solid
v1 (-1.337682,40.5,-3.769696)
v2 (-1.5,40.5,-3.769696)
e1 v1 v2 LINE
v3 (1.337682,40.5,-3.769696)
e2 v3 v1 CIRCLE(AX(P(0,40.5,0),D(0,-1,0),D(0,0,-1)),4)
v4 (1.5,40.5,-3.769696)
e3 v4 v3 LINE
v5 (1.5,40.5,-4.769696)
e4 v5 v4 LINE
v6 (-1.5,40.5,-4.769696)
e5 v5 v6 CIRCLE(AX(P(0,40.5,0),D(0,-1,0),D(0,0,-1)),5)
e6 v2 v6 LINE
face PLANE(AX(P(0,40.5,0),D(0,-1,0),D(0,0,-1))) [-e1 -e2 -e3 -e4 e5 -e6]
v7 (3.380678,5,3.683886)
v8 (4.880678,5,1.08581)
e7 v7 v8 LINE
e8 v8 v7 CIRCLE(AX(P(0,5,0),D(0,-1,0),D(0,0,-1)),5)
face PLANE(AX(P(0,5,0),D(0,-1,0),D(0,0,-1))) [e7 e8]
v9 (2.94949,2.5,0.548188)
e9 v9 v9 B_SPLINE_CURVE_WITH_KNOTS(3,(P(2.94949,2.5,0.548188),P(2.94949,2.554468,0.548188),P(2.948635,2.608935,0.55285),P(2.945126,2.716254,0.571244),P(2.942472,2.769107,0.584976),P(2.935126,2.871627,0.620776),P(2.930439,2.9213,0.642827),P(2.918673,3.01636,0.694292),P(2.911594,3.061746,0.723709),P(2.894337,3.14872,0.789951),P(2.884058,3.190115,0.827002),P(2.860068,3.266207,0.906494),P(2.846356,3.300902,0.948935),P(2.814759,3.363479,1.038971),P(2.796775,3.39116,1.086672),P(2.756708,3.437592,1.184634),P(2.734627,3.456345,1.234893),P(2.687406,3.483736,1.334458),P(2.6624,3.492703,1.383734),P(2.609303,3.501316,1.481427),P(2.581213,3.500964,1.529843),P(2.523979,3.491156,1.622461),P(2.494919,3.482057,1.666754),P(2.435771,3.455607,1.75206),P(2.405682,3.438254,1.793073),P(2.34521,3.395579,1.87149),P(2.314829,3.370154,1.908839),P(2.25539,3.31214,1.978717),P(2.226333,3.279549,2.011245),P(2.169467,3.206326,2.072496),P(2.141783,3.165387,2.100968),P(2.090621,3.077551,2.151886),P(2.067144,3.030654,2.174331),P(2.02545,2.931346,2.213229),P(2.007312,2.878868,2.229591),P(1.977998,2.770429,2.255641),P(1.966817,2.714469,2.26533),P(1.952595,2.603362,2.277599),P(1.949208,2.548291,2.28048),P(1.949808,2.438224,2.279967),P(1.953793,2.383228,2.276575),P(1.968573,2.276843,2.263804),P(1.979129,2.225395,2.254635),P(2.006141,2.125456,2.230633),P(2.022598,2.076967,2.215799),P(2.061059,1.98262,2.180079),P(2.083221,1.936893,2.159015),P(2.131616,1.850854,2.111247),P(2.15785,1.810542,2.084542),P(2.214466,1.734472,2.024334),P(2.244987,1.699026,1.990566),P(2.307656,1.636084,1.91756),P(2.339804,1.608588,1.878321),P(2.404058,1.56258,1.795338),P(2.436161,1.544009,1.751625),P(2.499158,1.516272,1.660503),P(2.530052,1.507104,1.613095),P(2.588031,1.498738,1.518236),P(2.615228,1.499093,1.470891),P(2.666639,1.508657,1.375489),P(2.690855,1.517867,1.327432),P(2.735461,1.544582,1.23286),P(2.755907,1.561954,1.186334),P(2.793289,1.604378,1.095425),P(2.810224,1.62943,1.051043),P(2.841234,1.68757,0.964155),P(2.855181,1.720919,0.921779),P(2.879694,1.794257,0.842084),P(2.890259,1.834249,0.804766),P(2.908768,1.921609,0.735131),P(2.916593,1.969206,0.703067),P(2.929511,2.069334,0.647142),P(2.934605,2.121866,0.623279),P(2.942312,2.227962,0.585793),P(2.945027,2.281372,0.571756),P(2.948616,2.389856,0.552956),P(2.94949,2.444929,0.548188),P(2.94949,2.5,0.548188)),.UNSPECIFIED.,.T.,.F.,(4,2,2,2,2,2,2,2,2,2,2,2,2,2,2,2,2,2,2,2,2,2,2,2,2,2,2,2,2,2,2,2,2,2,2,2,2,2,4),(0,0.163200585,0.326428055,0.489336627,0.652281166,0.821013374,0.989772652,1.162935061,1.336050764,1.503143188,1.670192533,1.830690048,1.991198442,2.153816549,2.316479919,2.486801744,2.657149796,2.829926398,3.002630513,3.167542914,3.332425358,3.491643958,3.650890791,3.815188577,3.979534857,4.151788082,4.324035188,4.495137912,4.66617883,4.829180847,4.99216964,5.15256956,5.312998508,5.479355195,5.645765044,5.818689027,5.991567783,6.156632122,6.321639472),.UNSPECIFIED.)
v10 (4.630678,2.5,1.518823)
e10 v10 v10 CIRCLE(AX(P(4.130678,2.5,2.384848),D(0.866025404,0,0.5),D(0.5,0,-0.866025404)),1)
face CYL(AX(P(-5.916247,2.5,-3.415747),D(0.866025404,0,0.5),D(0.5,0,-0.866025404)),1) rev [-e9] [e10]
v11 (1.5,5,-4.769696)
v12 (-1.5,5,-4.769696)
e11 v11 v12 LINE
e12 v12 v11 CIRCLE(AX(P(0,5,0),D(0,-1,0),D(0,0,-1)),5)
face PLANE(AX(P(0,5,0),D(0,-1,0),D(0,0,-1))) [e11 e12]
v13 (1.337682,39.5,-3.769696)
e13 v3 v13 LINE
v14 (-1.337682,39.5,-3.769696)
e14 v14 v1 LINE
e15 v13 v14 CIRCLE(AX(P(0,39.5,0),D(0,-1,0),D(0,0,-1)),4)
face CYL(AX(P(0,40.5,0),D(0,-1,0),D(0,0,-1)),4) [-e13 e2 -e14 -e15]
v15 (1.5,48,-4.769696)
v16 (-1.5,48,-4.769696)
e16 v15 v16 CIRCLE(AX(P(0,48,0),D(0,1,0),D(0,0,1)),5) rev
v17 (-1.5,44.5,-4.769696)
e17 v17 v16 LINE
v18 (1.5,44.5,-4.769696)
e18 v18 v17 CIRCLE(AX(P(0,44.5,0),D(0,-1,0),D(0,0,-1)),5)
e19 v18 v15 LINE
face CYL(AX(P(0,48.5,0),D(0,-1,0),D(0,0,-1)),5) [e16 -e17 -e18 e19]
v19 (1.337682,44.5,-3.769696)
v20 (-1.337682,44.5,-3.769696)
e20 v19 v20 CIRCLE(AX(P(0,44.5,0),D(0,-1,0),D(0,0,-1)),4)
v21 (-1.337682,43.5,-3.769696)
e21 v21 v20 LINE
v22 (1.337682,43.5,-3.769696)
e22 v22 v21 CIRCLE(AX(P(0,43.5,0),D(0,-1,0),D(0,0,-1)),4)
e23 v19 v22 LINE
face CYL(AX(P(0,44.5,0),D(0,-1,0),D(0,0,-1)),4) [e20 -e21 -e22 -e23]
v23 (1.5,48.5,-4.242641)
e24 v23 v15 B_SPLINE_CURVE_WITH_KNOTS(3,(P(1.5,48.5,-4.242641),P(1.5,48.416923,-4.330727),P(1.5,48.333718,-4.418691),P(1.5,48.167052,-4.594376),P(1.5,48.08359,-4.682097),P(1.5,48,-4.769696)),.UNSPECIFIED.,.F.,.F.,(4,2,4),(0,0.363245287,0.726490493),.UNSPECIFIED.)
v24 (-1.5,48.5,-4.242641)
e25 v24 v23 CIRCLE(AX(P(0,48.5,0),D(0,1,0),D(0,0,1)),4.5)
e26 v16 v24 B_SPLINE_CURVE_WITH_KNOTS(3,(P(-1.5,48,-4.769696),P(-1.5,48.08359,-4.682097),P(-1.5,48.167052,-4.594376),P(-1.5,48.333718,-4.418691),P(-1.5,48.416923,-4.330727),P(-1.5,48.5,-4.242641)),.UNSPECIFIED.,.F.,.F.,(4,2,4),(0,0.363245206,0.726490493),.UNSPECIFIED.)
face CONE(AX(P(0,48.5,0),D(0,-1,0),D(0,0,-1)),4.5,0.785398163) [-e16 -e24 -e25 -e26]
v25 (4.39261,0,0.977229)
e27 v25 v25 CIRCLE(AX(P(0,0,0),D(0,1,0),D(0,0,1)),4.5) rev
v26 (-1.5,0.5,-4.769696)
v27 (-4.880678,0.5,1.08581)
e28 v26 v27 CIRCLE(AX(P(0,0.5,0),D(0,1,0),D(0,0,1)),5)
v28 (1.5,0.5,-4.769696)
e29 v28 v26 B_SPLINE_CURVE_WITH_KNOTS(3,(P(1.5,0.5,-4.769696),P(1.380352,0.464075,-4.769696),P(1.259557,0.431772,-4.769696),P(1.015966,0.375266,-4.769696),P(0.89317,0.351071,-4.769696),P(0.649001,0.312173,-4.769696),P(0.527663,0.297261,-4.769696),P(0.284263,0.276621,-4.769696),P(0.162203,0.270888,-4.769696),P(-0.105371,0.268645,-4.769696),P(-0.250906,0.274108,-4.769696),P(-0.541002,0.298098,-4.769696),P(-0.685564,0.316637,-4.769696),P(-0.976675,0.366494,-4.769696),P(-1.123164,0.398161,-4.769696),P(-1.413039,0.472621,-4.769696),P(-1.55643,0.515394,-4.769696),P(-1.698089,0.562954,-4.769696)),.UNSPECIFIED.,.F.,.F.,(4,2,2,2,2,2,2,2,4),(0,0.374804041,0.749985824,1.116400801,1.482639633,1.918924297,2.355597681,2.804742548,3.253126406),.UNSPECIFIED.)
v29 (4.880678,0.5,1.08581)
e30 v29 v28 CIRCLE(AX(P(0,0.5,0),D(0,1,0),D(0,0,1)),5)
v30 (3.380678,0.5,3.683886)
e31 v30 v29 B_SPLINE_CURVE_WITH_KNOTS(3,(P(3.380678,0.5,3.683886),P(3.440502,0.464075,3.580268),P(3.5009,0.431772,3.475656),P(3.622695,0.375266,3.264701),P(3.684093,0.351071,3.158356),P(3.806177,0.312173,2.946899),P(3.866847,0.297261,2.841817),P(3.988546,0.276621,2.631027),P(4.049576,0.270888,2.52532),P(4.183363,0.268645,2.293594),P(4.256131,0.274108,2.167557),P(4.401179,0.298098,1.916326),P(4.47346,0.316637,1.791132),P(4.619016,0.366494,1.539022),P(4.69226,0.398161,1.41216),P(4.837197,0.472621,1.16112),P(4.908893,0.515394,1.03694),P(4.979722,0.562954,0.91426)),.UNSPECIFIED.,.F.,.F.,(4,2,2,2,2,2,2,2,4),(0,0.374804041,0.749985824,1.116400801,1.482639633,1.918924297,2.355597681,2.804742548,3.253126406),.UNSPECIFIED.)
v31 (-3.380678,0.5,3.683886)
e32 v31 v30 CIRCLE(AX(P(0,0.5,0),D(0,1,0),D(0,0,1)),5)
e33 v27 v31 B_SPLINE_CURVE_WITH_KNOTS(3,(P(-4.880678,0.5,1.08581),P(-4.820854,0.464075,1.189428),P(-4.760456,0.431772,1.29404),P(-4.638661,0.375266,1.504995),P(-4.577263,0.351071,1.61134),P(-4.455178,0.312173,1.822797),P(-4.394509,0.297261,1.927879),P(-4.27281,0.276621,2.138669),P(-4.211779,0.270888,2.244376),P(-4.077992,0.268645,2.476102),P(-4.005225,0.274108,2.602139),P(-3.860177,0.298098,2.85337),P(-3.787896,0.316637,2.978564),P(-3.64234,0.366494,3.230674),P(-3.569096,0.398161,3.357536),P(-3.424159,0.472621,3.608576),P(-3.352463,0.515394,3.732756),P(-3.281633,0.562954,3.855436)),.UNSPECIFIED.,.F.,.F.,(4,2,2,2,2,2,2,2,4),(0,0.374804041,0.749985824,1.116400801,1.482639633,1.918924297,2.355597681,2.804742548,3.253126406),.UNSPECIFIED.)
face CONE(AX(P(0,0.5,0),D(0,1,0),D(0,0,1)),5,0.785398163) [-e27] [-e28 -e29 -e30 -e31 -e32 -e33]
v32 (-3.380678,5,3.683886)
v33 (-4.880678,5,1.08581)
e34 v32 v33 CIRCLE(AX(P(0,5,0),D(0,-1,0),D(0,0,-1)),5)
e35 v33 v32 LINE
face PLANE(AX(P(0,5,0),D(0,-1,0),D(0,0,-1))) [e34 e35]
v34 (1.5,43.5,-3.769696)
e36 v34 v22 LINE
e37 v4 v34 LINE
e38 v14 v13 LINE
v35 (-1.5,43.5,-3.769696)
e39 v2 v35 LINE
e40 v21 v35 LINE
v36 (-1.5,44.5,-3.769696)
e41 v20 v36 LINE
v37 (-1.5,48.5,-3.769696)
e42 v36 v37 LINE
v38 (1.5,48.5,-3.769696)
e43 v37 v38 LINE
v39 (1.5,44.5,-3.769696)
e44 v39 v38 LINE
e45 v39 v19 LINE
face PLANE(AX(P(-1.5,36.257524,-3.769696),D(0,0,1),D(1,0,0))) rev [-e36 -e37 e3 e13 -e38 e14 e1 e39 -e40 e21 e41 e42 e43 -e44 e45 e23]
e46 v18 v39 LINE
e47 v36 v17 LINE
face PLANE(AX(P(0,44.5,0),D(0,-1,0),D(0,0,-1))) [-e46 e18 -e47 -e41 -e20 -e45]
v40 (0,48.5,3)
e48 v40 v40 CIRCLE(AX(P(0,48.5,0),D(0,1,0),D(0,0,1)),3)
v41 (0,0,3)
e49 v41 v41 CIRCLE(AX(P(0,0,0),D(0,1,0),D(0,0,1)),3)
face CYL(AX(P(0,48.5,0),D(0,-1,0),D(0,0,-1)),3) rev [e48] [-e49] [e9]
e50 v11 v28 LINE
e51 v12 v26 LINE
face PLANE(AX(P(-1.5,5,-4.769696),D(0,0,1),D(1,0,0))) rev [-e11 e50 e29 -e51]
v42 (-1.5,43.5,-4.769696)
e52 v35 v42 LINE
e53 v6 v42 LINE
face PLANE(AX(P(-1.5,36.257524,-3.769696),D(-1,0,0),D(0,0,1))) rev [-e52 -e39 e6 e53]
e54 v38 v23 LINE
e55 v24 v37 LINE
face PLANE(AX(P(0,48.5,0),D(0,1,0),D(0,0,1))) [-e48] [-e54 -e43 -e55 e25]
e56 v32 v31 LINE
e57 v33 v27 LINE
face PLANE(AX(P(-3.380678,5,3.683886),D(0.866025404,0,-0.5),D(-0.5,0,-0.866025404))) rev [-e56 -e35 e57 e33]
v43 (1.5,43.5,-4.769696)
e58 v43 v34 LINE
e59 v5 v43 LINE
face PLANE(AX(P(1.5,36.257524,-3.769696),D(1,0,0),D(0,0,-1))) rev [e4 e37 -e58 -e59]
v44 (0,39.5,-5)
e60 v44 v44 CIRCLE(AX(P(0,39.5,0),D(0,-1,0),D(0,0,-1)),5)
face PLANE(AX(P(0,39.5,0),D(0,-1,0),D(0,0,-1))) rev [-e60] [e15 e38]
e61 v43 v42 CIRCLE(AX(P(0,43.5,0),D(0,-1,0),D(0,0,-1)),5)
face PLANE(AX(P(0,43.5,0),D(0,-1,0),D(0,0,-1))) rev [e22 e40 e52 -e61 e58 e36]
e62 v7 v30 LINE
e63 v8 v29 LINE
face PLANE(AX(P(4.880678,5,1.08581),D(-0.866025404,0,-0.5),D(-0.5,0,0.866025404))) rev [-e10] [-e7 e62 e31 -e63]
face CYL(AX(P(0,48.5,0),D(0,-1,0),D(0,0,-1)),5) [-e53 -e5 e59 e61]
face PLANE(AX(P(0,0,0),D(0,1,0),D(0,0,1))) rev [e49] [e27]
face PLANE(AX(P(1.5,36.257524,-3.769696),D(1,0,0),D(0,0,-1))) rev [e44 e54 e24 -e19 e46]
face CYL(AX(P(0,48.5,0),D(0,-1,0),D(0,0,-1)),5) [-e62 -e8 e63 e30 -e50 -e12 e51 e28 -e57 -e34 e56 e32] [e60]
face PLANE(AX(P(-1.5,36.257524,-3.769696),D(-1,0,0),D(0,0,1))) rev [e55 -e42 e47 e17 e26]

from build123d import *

# Parameters (mm, degrees)
ESQUISSE1_R                  = 5
ESQUISSE1_R_2                = 3
BOSS_EXTRU_1_DEPTH           = 48.5
ENL_V_MAT_EXTRU_1_DEPTH      = 5
ENL_V_MAT_EXTRU_2_REACH      = 51.901
ENL_V_MAT_EXTRU_2_END_RADIUS = 3
ESQUISSE3_R                  = 1
ESQUISSE4_R                  = 5
ESQUISSE4_R_2                = 4
ENL_V_MAT_EXTRU_3_DEPTH      = 1
ESQUISSE6_R                  = 5
ESQUISSE6_R_2                = 4
ENL_V_MAT_EXTRU_5_DEPTH      = 1
ENL_V_MAT_EXTRU_4_REACH      = 51.013


with BuildPart() as part:
    # Esquisse1 → Boss.-Extru.1 (new body)
    with BuildSketch(Plane(origin=(0, 0, 0), x_dir=(1, 0, 0), z_dir=(0, 1, 0))):
        with Locations(Location((0, 0, 0), (0, 0, 90))):
            Circle(ESQUISSE1_R)
        with Locations(Location((0, 0, 0), (0, 0, 90))):
            Circle(ESQUISSE1_R_2, mode=Mode.SUBTRACT)
    extrude(amount=BOSS_EXTRU_1_DEPTH)

    # Esquisse2 → Enlèv. mat.-Extru.1 (cut)
    with BuildSketch(Plane.XZ):
        with BuildLine():
            Line((-1.5, -4.769696007), (1.5, -4.769696007))
            ThreePointArc((1.5, -4.769696007), (0, -5), (-1.5, -4.769696007))
        make_face()
        with BuildLine():
            Line((-3.38067791, 3.683886109), (-4.88067791, 1.085809898))
            ThreePointArc((-4.88067791, 1.085809898), (-4.330127019, 2.5), (-3.38067791, 3.683886109))
        make_face()
        with BuildLine():
            Line((4.88067791, 1.085809898), (3.38067791, 3.683886109))
            ThreePointArc((3.38067791, 3.683886109), (4.330127019, 2.5), (4.88067791, 1.085809898))
        make_face()
    extrude(amount=-ENL_V_MAT_EXTRU_1_DEPTH, mode=Mode.SUBTRACT)

    # Enlèv. mat.-Extru.2: up to this cylinder (the profile starts outside it)
    enl_v_mat_extru_2_end = Plane(origin=(0, 2.5, 0), z_dir=(0, -1, 0)) * Cylinder(ENL_V_MAT_EXTRU_2_END_RADIUS, 110.802, mode=Mode.PRIVATE)
    # Esquisse3 → Enlèv. mat.-Extru.2 (cut, up to the surface)
    with BuildSketch(Plane(origin=(4.13067791, 0, 2.384848004), x_dir=(0.49999999999999223, 0, -0.8660254037844431), z_dir=(0.8660254037844431, 0, 0.49999999999999223)), mode=Mode.PRIVATE) as enl_v_mat_extru_2_sk1:
        with Locations((0, 2.5)):
            Circle(ESQUISSE3_R)
    enl_v_mat_extru_2_tool1 = extrude(enl_v_mat_extru_2_sk1.sketch, amount=-ENL_V_MAT_EXTRU_2_REACH, mode=Mode.PRIVATE) - enl_v_mat_extru_2_end
    add(enl_v_mat_extru_2_tool1.solids().sort_by_distance((4.130678, 2.5, 2.384848))[0], mode=Mode.SUBTRACT)

    # Esquisse4 → Enlèv. mat.-Extru.3 (cut)
    with BuildSketch(Plane(origin=(0, 39.5, 0), x_dir=(-1, 0, 0), z_dir=(0, -1, 0))):
        with Locations(Location((0, 0, 0), (0, 0, 90))):
            Circle(ESQUISSE4_R)
        with Locations(Location((0, 0, 0), (0, 0, 90))):
            Circle(ESQUISSE4_R_2, mode=Mode.SUBTRACT)
    extrude(amount=-ENL_V_MAT_EXTRU_3_DEPTH, mode=Mode.SUBTRACT)

    # Esquisse6 → Enlèv. mat.-Extru.5 (cut)
    with BuildSketch(Plane(origin=(0, 43.5, 0), x_dir=(-1, 0, 0), z_dir=(0, -1, 0))):
        with Locations(Location((0, 0, 0), (0, 0, 90))):
            Circle(ESQUISSE6_R)
        with Locations(Location((0, 0, 0), (0, 0, 90))):
            Circle(ESQUISSE6_R_2, mode=Mode.SUBTRACT)
    extrude(amount=-ENL_V_MAT_EXTRU_5_DEPTH, mode=Mode.SUBTRACT)

    # Enlèv. mat.-Extru.4: up to this face of the body (flat: up to its plane)
    enl_v_mat_extru_4_end = Plane(part.part.faces().sort_by_distance((0, 39.5, 4.858578644))[0])
    # Esquisse5 → Enlèv. mat.-Extru.4 (cut, up to the picked face)
    with BuildSketch(Plane(origin=(0, 48.5, 0), x_dir=(1, 0, 0), z_dir=(0, 1, 0)), mode=Mode.PRIVATE) as enl_v_mat_extru_4_sk1:
        with BuildLine():
            Line((-1.5, 3.769696007), (1.5, 3.769696007))
            Line((1.5, 3.769696007), (1.5, 4.769696007))
            ThreePointArc((1.5, 4.769696007), (0, 5), (-1.5, 4.769696007))
            Line((-1.5, 4.769696007), (-1.5, 3.769696007))
        make_face()
    enl_v_mat_extru_4_tool1 = split(extrude(enl_v_mat_extru_4_sk1.sketch, amount=-ENL_V_MAT_EXTRU_4_REACH, mode=Mode.PRIVATE), bisect_by=enl_v_mat_extru_4_end, keep=Keep.BOTH, mode=Mode.PRIVATE)
    add(enl_v_mat_extru_4_tool1.solids().sort_by(Axis((0, 48.5, -4.348853), (0, -1, 0)))[0], mode=Mode.SUBTRACT)

    # Chanfrein1: read off the stored shape, not the designer's step
    # Chanfrein1 outline → Chanfrein1 (revolve, cut)
    with BuildSketch(Plane.XY):
        Polygon((5, 0.5), (4.5, 0), (5, 0), align=None)
        Polygon((4.5, 48.5), (5, 48), (5, 48.5), align=None)
    revolve(axis=Axis((0, 0, 0), (0, 1, 0)), mode=Mode.SUBTRACT)


solid = part.part
